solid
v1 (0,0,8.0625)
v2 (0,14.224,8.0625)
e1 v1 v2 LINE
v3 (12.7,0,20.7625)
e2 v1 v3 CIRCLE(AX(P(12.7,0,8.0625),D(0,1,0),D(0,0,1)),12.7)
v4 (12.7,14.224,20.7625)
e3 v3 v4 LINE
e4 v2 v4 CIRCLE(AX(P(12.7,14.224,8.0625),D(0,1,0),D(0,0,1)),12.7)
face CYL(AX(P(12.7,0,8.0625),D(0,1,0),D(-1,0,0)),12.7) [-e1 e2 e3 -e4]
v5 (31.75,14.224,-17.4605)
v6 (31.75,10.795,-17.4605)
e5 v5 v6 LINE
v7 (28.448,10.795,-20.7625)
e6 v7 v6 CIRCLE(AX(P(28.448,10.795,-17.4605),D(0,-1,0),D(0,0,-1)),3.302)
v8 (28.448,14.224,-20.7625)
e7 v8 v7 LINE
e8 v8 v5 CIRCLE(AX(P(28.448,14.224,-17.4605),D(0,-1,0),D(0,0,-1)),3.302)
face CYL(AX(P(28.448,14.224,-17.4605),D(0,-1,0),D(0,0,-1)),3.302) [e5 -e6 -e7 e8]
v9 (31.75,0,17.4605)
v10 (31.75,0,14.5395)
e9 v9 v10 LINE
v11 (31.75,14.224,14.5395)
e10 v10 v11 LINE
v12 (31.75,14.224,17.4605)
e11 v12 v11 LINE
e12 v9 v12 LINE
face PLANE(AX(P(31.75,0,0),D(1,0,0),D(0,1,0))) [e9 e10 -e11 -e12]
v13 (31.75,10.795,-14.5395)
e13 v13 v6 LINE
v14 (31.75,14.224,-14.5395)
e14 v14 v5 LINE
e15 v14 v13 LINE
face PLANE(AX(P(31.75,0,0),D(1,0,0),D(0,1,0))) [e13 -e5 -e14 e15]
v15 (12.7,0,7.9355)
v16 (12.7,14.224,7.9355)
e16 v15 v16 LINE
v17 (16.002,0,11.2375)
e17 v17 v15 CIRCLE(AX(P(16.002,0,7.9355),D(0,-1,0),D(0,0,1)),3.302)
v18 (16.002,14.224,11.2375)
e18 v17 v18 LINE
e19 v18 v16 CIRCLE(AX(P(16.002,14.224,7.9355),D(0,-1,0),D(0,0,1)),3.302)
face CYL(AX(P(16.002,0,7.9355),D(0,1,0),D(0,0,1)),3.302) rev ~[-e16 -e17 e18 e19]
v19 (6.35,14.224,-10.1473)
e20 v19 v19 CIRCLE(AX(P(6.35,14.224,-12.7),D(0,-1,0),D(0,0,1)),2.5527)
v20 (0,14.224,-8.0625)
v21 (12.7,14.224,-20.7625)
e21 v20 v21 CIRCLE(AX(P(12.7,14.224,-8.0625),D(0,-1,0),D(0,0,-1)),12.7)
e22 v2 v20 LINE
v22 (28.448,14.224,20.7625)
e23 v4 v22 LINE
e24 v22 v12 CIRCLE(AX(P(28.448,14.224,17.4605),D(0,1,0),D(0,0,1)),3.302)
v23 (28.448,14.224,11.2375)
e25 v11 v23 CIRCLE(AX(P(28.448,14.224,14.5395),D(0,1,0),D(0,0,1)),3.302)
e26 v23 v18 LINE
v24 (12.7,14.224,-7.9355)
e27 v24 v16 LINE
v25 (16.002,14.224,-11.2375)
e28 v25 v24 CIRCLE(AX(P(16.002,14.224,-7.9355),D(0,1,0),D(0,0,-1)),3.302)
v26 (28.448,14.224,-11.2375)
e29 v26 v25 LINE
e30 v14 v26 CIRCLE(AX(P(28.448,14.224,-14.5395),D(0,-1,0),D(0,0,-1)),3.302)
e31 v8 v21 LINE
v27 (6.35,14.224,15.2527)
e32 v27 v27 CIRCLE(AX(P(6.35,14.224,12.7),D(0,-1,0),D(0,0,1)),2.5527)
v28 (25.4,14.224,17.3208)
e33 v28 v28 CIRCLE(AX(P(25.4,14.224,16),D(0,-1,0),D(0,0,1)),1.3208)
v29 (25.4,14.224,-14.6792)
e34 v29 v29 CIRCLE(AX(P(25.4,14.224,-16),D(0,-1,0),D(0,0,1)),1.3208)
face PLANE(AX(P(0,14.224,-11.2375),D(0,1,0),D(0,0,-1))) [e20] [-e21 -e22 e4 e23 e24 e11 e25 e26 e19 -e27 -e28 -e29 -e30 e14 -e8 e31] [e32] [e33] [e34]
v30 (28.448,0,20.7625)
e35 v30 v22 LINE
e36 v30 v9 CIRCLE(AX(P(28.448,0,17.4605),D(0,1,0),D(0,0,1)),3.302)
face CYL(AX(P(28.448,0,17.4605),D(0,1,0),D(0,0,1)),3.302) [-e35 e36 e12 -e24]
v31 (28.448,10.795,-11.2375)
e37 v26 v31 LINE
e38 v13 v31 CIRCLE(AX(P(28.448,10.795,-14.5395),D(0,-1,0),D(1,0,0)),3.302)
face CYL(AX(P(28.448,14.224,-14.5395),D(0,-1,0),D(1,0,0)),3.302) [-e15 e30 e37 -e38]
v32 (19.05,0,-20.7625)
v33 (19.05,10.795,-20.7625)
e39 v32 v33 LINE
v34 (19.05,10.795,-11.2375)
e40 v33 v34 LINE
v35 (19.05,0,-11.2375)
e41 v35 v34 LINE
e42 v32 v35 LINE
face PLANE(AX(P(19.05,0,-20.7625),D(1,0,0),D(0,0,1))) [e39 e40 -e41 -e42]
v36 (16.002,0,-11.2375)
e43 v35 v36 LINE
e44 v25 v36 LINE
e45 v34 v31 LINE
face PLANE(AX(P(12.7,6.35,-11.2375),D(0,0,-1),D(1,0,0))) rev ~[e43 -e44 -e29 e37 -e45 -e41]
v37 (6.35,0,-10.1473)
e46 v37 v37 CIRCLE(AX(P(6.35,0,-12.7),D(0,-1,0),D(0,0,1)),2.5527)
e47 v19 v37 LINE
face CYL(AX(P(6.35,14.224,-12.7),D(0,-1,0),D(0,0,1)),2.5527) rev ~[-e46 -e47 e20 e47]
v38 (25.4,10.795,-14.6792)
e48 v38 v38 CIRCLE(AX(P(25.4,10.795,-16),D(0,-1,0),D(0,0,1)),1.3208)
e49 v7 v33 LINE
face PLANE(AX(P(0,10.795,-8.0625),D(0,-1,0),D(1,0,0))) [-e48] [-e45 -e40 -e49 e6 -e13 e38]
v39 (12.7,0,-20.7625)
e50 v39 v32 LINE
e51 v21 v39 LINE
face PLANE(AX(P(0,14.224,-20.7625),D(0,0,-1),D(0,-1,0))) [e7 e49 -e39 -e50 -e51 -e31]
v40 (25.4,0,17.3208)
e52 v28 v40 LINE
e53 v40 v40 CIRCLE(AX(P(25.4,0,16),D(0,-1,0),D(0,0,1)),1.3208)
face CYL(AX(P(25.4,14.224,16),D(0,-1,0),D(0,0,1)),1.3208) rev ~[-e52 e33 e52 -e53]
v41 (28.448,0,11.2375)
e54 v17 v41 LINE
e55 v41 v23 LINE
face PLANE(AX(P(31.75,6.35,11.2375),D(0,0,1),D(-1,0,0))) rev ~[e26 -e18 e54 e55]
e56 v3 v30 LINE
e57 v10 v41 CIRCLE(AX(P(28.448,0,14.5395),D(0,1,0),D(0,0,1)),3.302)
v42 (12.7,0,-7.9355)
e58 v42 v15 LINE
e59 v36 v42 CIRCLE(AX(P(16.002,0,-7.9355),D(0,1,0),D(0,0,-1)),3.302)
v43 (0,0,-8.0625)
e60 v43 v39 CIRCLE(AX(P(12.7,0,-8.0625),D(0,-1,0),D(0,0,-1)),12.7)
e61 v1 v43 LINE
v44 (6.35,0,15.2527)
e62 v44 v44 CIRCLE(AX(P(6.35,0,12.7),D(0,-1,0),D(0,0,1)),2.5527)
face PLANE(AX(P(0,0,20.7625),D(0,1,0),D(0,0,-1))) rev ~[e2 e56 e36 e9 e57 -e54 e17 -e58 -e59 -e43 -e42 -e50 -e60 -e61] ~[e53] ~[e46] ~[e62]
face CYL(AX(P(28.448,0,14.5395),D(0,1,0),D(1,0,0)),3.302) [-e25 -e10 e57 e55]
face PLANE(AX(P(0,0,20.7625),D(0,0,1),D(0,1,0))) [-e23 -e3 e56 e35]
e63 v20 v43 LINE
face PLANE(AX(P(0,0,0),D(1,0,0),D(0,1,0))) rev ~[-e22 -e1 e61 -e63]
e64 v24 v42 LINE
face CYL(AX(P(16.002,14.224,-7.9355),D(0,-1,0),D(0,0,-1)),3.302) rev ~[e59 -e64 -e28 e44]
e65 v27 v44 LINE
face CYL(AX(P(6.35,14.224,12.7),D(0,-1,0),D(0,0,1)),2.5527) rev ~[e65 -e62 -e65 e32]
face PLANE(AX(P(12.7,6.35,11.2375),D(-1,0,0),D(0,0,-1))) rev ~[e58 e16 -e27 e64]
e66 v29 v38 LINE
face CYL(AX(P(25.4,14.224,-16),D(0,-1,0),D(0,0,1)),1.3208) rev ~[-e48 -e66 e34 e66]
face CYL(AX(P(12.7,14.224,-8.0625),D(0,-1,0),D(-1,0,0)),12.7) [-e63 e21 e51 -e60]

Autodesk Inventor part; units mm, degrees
ref_plane "YZ Plane" through (0, 0, 0) normal (1, 0, 0) x (0, 1, 0)
ref_plane "XZ Plane" through (0, 0, 0) normal (0, 1, 0) x (-1, 0, 0)
ref_plane "XY Plane" through (0, 0, 0) normal (0, 0, 1) x (1, 0, 0)
sketch "Sketch1" plane through (0, 0, 0) normal (1, 0, 0) x (0, 1, 0)
  line L0 (0, 20.7625) -> (0, -20.7625)
  line L1 (0, 20.7625) -> (14.224, 20.7625)
  line L2 (14.224, 20.7625) -> (14.224, 11.2375)
  line L3 (14.224, 11.2375) -> (6.35, 11.2375)
  line L4 (6.35, 11.2375) -> (6.35, -11.2375)
  line L5 (6.35, -11.2375) -> (14.224, -11.2375)
  line L6 (14.224, -11.2375) -> (14.224, -20.7625)
  line L7 (14.224, -20.7625) -> (0, -20.7625)
  point P0 (0, 0)
  point P1 (0, 0)
  point P2 (14.224, -16)
  point P3 (14.224, 16)
  dimension "d1" = 32
  dimension "d2" = 7.874
  dimension "d4" = 6.35
  dimension "d5" = 9.525
extrude "Extrusion1" add sketch "Sketch1" along normal blind 31.75
sketch "Sketch2" plane through (0, 14.224, 20.7625) normal (0, 1, 0) x (1, 0, 0)
  line L0 (0, 9.525) -> (31.75, 9.525) construction
  line L1 (31.75, 9.525) -> (31.75, 0) construction
  line L2 (31.75, 0) -> (0, 0) construction
  line L3 (0, 0) -> (0, 9.525) construction
  line L4 (0, 41.525) -> (31.75, 41.525) construction
  line L5 (31.75, 41.525) -> (31.75, 32) construction
  line L6 (31.75, 32) -> (0, 32) construction
  line L7 (0, 32) -> (0, 41.525) construction
  point P0 (0, 20.7625)
  point P1 (25.4, 4.7625)
  point P2 (25.4, 36.7625)
  point P3 (31.75, 4.7625)
  point P4 (31.75, 36.7625)
  dimension "d8" = 6.35
hole "Hole1" at (25.4, 14.224, 16) at (25.4, 14.224, -16) direction (0, -1, 0) diameter 2.6416 end through all thread size "6-32 UNC" class "2B" standard "ANSI Unified Screw Threads"
sketch "Sketch4" plane through (0, 6.35, 11.2375) normal (0, 1, 0) x (1, 0, 0)
  circle A0 centre (25.4, -4.7625) radius 1.3208 construction
  circle A1 centre (25.4, 27.2375) radius 1.3208 construction
  line L0 (0, 32) -> (31.75, 32) construction
  line L1 (31.75, 32) -> (31.75, 22.475) construction
  line L2 (31.75, 22.475) -> (0, 22.475) construction
  line L3 (0, 0) -> (0, 22.475) construction
  line L4 (0, 0) -> (31.75, 0) construction
  line L5 (31.75, 0) -> (31.75, -9.525) construction
  line L6 (31.75, -9.525) -> (0, -9.525) construction
  line L7 (0, -9.525) -> (0, 0) construction
  line L8 (0, 22.475) -> (0, 32) construction
  line L9 (31.75, 22.475) -> (31.75, 0) construction
  line L10 (0, 22.475) -> (31.75, 22.475) construction
  line L11 (31.75, 0) -> (12.7, 0)
  line L12 (12.7, 0) -> (12.7, 22.475)
  line L13 (12.7, 22.475) -> (31.75, 22.475)
  line L14 (31.75, 22.475) -> (31.75, 0)
  point P0 (0, 11.2375)
  point P1 (14.7922, 22.475)
  dimension "d25" = 19.05
extrude "Extrusion2" cut sketch "Sketch4" along normal mid plane 38.1
sketch "Sketch5" plane through (0, 14.224, 20.7625) normal (0, 1, 0) x (1, 0, 0)
  line L0 (0, 0) -> (0, 41.525) construction
  line L1 (0, 41.525) -> (31.75, 41.525) construction
  line L2 (0, 41.525) -> (12.7, 41.525)
  line L3 (12.7, 41.525) -> (12.7, 0.1925)
  line L4 (12.7, 0.1925) -> (0, 0.1925)
  line L5 (0, 0.1925) -> (0, 41.525)
  line L6 (12.7, 9.525) -> (12.7, 32) construction
  point P0 (0, 20.7625)
extrude "Extrusion3" add sketch "Sketch5" against normal up to surface (7.874 mm away)
sketch "Sketch6" plane through (0, 14.224, 20.7625) normal (0, 1, 0) x (1, 0, 0)
  line L0 (6.35, 8.0625) -> (6.35, 33.4625) construction
  line L1 (0, 41.525) -> (0, 0) construction
  point P0 (0, 20.7625)
  point P1 (6.35, 20.7625)
  point P2 (0, 20.7625)
  dimension "d30" = 6.35
  dimension "d31" = 25.4
hole "Hole3" at (6.35, 14.224, 12.7) at (6.35, 14.224, -12.7) direction (0, -1, 0) diameter 5.1054 end through all clearance for "Flat Head Machine Screw (82)" size "#10" standard "Ansi Unified Screw Threads"
fillet "Fillet1" radius 12.7 2 edges at (0, 7.112, -20.7625) (0, 7.112, 20.7625)
fillet "Fillet2" radius 3.302 6 edges at (12.7, 7.112, -11.2375) (12.7, 7.112, 11.2375) (31.75, 7.112, 20.7625) (31.75, 7.112, 11.2375) (31.75, 7.112, -11.2375) (31.75, 7.112, -20.7625)
sketch "Sketch7" plane through (0, 0, -8.0625) normal (0, -1, 0) x (1, 0, 0)
  arc A0 (16.002, 19.3) -> (12.7, 15.998) centre (16.002, 15.998) ccw construction
  line L0 (12.7, 15.998) -> (12.7, 0.127) construction
  arc A1 (12.7, 0.127) -> (16.002, -3.175) centre (16.002, 0.127) ccw construction
  line L1 (16.002, -3.175) -> (28.448, -3.175) construction
  arc A2 (31.75, -6.477) -> (28.448, -3.175) centre (28.448, -6.477) ccw projected
  line L2 (31.75, -6.477) -> (31.75, -9.398) projected
  arc A3 (28.448, -12.7) -> (31.75, -9.398) centre (28.448, -9.398) ccw projected
  line L3 (28.448, -12.7) -> (12.7, -12.7) construction
  arc A4 (0, 0) -> (12.7, -12.7) centre (12.7, 0) ccw construction
  line L4 (0, 0) -> (0, 16.125) construction
  arc A5 (12.7, 28.825) -> (0, 16.125) centre (12.7, 16.125) ccw construction
  line L5 (12.7, 28.825) -> (28.448, 28.825) construction
  arc A6 (31.75, 25.523) -> (28.448, 28.825) centre (28.448, 25.523) ccw construction
  line L6 (31.75, 25.523) -> (31.75, 22.602) construction
  arc A7 (28.448, 19.3) -> (31.75, 22.602) centre (28.448, 22.602) ccw construction
  line L7 (28.448, 19.3) -> (16.002, 19.3) construction
  circle A8 centre (6.35, 20.7625) radius 2.5527 construction
  circle A9 centre (6.35, -4.6375) radius 2.5527 construction
  circle A10 centre (25.4, 24.0625) radius 1.3208 construction
  circle A11 centre (25.4, -7.9375) radius 1.3208 projected
  line L8 (12.7, -12.7) -> (28.448, -12.7) construction
  line L9 (28.448, -12.7) -> (19.05, -12.7)
  line L10 (19.05, -12.7) -> (19.05, -3.175)
  line L11 (16.002, -3.175) -> (28.448, -3.175) construction
  line L12 (19.05, -3.175) -> (28.448, -3.175)
  point P0 (0, 8.0625)
  dimension "d41" = 12.7
extrude "Extrusion4" cut sketch "Sketch7" against normal blind 10.795
properties part number "GP7-006" material "Aluminum 6061"
